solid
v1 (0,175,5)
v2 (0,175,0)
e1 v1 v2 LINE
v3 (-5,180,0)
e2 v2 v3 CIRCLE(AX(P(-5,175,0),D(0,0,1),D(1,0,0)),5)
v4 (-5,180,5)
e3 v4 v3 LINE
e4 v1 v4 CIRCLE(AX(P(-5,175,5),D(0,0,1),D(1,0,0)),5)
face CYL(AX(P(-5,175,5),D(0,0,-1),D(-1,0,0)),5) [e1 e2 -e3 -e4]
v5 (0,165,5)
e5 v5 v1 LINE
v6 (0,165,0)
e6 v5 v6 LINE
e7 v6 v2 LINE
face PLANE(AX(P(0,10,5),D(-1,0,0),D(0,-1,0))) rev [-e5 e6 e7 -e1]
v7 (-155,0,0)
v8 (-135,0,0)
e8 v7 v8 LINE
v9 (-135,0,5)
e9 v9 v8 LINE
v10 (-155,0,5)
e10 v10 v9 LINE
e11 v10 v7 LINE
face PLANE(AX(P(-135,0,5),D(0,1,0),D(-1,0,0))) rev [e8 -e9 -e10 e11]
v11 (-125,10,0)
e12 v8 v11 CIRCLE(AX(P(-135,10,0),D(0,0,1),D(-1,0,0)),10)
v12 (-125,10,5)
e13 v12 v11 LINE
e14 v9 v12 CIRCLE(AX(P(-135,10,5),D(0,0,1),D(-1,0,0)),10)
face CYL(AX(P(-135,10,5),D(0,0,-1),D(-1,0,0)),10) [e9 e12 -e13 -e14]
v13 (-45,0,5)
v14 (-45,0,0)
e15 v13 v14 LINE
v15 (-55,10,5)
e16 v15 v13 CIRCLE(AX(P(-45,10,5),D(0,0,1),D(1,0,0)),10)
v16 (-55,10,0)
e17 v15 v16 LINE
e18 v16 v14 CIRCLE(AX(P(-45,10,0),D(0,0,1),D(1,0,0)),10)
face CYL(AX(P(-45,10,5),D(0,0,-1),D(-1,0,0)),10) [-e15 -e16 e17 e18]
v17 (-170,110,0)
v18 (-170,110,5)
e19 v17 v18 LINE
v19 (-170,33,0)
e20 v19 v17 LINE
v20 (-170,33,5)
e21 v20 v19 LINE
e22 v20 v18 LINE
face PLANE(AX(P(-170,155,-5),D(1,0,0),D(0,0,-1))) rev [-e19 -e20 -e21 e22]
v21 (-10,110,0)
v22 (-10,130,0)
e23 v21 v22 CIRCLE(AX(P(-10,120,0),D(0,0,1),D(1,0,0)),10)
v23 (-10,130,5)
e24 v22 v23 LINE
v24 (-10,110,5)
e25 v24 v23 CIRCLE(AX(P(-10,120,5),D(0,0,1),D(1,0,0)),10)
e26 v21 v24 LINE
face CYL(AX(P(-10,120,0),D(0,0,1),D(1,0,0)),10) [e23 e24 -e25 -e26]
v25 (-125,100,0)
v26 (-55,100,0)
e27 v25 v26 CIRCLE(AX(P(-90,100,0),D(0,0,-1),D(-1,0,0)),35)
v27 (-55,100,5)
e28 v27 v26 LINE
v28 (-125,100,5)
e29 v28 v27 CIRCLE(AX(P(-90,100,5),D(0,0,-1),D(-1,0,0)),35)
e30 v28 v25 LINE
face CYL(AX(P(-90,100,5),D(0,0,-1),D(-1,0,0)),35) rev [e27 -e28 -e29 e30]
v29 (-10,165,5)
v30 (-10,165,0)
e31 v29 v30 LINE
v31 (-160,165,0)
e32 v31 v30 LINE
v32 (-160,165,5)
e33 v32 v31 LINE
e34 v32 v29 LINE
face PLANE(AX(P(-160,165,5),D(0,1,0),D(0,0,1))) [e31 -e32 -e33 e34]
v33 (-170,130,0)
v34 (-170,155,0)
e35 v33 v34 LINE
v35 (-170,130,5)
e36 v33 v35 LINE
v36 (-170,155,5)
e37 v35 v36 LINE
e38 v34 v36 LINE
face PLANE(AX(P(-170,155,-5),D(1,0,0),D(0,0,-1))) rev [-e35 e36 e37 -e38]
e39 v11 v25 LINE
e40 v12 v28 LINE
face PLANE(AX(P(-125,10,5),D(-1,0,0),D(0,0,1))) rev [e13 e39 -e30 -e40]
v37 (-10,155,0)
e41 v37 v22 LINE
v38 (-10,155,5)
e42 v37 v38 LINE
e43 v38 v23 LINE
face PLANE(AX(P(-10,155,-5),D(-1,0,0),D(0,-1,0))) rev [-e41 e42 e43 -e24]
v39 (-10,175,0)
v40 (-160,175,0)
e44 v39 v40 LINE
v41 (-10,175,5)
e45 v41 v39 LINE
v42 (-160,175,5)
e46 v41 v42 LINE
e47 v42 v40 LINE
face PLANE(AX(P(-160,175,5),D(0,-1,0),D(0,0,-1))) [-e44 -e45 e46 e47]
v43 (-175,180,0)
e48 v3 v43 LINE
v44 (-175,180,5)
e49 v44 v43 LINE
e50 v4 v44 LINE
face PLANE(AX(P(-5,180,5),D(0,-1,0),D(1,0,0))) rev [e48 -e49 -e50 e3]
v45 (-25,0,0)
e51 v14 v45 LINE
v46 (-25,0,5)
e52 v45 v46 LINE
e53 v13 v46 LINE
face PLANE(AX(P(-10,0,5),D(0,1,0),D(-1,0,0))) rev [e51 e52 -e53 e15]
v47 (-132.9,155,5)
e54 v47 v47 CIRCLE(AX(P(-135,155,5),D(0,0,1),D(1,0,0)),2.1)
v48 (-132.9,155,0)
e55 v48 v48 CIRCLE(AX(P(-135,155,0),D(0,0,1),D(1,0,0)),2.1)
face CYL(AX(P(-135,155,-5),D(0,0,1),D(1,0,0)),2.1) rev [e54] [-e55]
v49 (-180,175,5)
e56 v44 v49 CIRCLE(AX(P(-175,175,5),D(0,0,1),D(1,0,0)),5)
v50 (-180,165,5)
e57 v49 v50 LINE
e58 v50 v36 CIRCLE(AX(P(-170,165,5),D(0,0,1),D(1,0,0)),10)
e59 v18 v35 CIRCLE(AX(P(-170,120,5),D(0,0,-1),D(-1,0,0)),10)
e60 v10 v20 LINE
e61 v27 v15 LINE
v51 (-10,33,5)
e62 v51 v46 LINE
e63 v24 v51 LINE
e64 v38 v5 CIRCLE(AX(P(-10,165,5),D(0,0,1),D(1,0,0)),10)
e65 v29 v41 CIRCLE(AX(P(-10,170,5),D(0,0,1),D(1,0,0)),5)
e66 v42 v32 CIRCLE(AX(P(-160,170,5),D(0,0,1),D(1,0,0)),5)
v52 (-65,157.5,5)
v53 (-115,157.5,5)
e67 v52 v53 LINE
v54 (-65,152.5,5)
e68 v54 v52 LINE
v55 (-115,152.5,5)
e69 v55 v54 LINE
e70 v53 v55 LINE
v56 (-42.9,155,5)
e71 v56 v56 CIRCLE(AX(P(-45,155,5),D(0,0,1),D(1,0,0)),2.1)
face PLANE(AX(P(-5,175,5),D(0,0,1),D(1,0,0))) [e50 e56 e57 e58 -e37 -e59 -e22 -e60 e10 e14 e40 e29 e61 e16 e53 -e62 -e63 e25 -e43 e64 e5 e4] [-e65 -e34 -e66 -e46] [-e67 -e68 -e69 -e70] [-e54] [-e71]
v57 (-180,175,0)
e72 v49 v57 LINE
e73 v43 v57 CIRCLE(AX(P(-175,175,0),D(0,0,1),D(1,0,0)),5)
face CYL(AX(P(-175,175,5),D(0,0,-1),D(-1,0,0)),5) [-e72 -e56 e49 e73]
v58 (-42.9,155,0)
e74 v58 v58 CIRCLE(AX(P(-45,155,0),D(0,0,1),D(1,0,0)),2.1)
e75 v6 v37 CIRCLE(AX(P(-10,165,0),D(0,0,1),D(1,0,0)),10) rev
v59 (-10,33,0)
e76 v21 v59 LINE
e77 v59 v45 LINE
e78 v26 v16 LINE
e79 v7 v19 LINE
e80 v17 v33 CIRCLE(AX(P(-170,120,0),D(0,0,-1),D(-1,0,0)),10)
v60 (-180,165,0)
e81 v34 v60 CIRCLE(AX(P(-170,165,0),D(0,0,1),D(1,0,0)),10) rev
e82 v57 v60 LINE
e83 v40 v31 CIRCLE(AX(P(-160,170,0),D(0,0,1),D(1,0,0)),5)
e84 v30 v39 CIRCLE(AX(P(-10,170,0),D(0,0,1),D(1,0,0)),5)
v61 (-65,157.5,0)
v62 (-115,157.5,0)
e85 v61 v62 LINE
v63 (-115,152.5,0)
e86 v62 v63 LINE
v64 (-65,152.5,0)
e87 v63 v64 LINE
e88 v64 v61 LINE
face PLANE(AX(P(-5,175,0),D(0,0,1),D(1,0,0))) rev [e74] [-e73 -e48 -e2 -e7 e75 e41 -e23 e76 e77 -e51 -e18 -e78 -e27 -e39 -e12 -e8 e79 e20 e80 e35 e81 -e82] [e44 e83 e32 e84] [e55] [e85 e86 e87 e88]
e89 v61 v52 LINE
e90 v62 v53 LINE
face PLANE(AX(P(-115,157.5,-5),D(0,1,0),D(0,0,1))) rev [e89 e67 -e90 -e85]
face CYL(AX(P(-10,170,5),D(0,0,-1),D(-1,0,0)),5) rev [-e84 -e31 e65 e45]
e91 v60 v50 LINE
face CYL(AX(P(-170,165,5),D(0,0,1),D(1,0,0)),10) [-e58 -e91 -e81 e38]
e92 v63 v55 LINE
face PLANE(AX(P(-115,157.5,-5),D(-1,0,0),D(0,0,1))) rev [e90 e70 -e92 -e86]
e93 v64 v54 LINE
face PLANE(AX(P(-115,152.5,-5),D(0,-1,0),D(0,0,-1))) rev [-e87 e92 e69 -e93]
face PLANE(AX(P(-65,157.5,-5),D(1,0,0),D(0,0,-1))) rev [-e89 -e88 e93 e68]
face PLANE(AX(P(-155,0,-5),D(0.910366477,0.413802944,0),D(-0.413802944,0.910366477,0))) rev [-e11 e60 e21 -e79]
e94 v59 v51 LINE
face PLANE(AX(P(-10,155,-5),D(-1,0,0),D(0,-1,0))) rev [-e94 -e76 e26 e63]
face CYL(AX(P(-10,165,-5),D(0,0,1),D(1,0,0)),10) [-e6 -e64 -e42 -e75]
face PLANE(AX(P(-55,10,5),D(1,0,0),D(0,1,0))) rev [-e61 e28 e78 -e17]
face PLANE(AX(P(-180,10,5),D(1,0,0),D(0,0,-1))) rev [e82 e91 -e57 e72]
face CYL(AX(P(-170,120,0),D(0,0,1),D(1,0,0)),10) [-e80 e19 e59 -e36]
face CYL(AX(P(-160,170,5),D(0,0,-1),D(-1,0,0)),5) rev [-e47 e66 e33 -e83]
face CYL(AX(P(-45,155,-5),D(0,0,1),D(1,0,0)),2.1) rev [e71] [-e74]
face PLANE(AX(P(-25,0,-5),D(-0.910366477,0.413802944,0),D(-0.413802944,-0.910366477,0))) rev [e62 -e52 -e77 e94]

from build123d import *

# Parameters (mm, degrees)
BOSS_EXTRUDE1_DEPTH = 5
SKETCH2_R           = 2.1
SKETCH2_W           = 50
SKETCH2_H           = 5
CUT_EXTRUDE1_DEPTH  = 10
CUT_EXTRUDE2_DEPTH  = 10
CUT_EXTRUDE3_DEPTH  = 10
FILLET1_R           = 10
BOSS_EXTRUDE2_DEPTH = 5


with BuildPart() as part:
    # Sketch1 → Boss-Extrude1 (new body)
    with BuildSketch(Plane.XY):
        with BuildLine():
            Line((-10, 0), (-45, 0))
            ThreePointArc((-45, 0), (-52.071067812, 2.928932188), (-55, 10))
            Line((-55, 10), (-55, 100))
            ThreePointArc((-55, 100), (-90, 135), (-125, 100))
            Line((-125, 100), (-125, 10))
            ThreePointArc((-125, 10), (-127.928932188, 2.928932188), (-135, 0))
            Line((-135, 0), (-170, 0))
            ThreePointArc((-170, 0), (-177.071067812, 2.928932188), (-180, 10))
            Line((-180, 10), (-180, 175))
            ThreePointArc((-180, 175), (-178.535533906, 178.535533906), (-175, 180))
            Line((-175, 180), (-5, 180))
            ThreePointArc((-5, 180), (-1.464466094, 178.535533906), (0, 175))
            Line((0, 175), (0, 10))
            ThreePointArc((0, 10), (-2.928932188, 2.928932188), (-10, 0))
        make_face()
        with BuildLine():
            Line((-160, 175), (-10, 175))
            ThreePointArc((-10, 175), (-5, 170), (-10, 165))
            Line((-10, 165), (-160, 165))
            ThreePointArc((-160, 165), (-165, 170), (-160, 175))
        make_face(mode=Mode.SUBTRACT)
    extrude(amount=BOSS_EXTRUDE1_DEPTH)

    # Sketch2 → Cut-Extrude1 (cut)
    with BuildSketch(Plane.XY.offset(5)):
        with Locations((-135, 155)):
            Circle(SKETCH2_R)
        with Locations((-45, 155)):
            Circle(SKETCH2_R)
        with Locations((-90, 155)):
            Rectangle(SKETCH2_W, SKETCH2_H)
    extrude(amount=-CUT_EXTRUDE1_DEPTH, mode=Mode.SUBTRACT)

    # Sketch3 → Cut-Extrude2 (cut)
    with BuildSketch(Plane.XY.offset(5)):
        Polygon((0, 55), (0, 0), (-25, 0), align=None)
        Polygon((-155, 0), (-180, 55), (-180, 0), align=None)
    extrude(amount=-CUT_EXTRUDE2_DEPTH, mode=Mode.SUBTRACT)

    # Sketch4 → Cut-Extrude3 (cut)
    with BuildSketch(Plane.XY.offset(5)):
        Polygon((0, 155), (-10, 155), (-10, 33), (0, 55), align=None)
        Polygon((-180, 55), (-170, 33), (-170, 155), (-180, 155), align=None)
    extrude(amount=-CUT_EXTRUDE3_DEPTH, mode=Mode.SUBTRACT)

    # Fillet1
    fillet1_edges = [part.edges().sort_by_distance(p)[0] for p in [
        (0, 155, 2.5),
        (-180, 155, 2.5),
    ]]
    fillet(fillet1_edges, radius=FILLET1_R - 0.0001)  # a hair under: the kernel refuses the full size

    # Sketch5 → Boss-Extrude2 (add)
    with BuildSketch(Plane.XY.offset(5)):
        with BuildLine():
            Line((-10, 130), (-10, 110))
            ThreePointArc((-10, 110), (0, 120), (-10, 130))
        make_face()
    boss_extrude2 = extrude(amount=-BOSS_EXTRUDE2_DEPTH)

    # Mirror1: Boss-Extrude2 across plane
    add(boss_extrude2.mirror(Plane(origin=(-90, 0, 0), x_dir=(0, 0, 1), z_dir=(1, 0, 0))))


solid = part.part
